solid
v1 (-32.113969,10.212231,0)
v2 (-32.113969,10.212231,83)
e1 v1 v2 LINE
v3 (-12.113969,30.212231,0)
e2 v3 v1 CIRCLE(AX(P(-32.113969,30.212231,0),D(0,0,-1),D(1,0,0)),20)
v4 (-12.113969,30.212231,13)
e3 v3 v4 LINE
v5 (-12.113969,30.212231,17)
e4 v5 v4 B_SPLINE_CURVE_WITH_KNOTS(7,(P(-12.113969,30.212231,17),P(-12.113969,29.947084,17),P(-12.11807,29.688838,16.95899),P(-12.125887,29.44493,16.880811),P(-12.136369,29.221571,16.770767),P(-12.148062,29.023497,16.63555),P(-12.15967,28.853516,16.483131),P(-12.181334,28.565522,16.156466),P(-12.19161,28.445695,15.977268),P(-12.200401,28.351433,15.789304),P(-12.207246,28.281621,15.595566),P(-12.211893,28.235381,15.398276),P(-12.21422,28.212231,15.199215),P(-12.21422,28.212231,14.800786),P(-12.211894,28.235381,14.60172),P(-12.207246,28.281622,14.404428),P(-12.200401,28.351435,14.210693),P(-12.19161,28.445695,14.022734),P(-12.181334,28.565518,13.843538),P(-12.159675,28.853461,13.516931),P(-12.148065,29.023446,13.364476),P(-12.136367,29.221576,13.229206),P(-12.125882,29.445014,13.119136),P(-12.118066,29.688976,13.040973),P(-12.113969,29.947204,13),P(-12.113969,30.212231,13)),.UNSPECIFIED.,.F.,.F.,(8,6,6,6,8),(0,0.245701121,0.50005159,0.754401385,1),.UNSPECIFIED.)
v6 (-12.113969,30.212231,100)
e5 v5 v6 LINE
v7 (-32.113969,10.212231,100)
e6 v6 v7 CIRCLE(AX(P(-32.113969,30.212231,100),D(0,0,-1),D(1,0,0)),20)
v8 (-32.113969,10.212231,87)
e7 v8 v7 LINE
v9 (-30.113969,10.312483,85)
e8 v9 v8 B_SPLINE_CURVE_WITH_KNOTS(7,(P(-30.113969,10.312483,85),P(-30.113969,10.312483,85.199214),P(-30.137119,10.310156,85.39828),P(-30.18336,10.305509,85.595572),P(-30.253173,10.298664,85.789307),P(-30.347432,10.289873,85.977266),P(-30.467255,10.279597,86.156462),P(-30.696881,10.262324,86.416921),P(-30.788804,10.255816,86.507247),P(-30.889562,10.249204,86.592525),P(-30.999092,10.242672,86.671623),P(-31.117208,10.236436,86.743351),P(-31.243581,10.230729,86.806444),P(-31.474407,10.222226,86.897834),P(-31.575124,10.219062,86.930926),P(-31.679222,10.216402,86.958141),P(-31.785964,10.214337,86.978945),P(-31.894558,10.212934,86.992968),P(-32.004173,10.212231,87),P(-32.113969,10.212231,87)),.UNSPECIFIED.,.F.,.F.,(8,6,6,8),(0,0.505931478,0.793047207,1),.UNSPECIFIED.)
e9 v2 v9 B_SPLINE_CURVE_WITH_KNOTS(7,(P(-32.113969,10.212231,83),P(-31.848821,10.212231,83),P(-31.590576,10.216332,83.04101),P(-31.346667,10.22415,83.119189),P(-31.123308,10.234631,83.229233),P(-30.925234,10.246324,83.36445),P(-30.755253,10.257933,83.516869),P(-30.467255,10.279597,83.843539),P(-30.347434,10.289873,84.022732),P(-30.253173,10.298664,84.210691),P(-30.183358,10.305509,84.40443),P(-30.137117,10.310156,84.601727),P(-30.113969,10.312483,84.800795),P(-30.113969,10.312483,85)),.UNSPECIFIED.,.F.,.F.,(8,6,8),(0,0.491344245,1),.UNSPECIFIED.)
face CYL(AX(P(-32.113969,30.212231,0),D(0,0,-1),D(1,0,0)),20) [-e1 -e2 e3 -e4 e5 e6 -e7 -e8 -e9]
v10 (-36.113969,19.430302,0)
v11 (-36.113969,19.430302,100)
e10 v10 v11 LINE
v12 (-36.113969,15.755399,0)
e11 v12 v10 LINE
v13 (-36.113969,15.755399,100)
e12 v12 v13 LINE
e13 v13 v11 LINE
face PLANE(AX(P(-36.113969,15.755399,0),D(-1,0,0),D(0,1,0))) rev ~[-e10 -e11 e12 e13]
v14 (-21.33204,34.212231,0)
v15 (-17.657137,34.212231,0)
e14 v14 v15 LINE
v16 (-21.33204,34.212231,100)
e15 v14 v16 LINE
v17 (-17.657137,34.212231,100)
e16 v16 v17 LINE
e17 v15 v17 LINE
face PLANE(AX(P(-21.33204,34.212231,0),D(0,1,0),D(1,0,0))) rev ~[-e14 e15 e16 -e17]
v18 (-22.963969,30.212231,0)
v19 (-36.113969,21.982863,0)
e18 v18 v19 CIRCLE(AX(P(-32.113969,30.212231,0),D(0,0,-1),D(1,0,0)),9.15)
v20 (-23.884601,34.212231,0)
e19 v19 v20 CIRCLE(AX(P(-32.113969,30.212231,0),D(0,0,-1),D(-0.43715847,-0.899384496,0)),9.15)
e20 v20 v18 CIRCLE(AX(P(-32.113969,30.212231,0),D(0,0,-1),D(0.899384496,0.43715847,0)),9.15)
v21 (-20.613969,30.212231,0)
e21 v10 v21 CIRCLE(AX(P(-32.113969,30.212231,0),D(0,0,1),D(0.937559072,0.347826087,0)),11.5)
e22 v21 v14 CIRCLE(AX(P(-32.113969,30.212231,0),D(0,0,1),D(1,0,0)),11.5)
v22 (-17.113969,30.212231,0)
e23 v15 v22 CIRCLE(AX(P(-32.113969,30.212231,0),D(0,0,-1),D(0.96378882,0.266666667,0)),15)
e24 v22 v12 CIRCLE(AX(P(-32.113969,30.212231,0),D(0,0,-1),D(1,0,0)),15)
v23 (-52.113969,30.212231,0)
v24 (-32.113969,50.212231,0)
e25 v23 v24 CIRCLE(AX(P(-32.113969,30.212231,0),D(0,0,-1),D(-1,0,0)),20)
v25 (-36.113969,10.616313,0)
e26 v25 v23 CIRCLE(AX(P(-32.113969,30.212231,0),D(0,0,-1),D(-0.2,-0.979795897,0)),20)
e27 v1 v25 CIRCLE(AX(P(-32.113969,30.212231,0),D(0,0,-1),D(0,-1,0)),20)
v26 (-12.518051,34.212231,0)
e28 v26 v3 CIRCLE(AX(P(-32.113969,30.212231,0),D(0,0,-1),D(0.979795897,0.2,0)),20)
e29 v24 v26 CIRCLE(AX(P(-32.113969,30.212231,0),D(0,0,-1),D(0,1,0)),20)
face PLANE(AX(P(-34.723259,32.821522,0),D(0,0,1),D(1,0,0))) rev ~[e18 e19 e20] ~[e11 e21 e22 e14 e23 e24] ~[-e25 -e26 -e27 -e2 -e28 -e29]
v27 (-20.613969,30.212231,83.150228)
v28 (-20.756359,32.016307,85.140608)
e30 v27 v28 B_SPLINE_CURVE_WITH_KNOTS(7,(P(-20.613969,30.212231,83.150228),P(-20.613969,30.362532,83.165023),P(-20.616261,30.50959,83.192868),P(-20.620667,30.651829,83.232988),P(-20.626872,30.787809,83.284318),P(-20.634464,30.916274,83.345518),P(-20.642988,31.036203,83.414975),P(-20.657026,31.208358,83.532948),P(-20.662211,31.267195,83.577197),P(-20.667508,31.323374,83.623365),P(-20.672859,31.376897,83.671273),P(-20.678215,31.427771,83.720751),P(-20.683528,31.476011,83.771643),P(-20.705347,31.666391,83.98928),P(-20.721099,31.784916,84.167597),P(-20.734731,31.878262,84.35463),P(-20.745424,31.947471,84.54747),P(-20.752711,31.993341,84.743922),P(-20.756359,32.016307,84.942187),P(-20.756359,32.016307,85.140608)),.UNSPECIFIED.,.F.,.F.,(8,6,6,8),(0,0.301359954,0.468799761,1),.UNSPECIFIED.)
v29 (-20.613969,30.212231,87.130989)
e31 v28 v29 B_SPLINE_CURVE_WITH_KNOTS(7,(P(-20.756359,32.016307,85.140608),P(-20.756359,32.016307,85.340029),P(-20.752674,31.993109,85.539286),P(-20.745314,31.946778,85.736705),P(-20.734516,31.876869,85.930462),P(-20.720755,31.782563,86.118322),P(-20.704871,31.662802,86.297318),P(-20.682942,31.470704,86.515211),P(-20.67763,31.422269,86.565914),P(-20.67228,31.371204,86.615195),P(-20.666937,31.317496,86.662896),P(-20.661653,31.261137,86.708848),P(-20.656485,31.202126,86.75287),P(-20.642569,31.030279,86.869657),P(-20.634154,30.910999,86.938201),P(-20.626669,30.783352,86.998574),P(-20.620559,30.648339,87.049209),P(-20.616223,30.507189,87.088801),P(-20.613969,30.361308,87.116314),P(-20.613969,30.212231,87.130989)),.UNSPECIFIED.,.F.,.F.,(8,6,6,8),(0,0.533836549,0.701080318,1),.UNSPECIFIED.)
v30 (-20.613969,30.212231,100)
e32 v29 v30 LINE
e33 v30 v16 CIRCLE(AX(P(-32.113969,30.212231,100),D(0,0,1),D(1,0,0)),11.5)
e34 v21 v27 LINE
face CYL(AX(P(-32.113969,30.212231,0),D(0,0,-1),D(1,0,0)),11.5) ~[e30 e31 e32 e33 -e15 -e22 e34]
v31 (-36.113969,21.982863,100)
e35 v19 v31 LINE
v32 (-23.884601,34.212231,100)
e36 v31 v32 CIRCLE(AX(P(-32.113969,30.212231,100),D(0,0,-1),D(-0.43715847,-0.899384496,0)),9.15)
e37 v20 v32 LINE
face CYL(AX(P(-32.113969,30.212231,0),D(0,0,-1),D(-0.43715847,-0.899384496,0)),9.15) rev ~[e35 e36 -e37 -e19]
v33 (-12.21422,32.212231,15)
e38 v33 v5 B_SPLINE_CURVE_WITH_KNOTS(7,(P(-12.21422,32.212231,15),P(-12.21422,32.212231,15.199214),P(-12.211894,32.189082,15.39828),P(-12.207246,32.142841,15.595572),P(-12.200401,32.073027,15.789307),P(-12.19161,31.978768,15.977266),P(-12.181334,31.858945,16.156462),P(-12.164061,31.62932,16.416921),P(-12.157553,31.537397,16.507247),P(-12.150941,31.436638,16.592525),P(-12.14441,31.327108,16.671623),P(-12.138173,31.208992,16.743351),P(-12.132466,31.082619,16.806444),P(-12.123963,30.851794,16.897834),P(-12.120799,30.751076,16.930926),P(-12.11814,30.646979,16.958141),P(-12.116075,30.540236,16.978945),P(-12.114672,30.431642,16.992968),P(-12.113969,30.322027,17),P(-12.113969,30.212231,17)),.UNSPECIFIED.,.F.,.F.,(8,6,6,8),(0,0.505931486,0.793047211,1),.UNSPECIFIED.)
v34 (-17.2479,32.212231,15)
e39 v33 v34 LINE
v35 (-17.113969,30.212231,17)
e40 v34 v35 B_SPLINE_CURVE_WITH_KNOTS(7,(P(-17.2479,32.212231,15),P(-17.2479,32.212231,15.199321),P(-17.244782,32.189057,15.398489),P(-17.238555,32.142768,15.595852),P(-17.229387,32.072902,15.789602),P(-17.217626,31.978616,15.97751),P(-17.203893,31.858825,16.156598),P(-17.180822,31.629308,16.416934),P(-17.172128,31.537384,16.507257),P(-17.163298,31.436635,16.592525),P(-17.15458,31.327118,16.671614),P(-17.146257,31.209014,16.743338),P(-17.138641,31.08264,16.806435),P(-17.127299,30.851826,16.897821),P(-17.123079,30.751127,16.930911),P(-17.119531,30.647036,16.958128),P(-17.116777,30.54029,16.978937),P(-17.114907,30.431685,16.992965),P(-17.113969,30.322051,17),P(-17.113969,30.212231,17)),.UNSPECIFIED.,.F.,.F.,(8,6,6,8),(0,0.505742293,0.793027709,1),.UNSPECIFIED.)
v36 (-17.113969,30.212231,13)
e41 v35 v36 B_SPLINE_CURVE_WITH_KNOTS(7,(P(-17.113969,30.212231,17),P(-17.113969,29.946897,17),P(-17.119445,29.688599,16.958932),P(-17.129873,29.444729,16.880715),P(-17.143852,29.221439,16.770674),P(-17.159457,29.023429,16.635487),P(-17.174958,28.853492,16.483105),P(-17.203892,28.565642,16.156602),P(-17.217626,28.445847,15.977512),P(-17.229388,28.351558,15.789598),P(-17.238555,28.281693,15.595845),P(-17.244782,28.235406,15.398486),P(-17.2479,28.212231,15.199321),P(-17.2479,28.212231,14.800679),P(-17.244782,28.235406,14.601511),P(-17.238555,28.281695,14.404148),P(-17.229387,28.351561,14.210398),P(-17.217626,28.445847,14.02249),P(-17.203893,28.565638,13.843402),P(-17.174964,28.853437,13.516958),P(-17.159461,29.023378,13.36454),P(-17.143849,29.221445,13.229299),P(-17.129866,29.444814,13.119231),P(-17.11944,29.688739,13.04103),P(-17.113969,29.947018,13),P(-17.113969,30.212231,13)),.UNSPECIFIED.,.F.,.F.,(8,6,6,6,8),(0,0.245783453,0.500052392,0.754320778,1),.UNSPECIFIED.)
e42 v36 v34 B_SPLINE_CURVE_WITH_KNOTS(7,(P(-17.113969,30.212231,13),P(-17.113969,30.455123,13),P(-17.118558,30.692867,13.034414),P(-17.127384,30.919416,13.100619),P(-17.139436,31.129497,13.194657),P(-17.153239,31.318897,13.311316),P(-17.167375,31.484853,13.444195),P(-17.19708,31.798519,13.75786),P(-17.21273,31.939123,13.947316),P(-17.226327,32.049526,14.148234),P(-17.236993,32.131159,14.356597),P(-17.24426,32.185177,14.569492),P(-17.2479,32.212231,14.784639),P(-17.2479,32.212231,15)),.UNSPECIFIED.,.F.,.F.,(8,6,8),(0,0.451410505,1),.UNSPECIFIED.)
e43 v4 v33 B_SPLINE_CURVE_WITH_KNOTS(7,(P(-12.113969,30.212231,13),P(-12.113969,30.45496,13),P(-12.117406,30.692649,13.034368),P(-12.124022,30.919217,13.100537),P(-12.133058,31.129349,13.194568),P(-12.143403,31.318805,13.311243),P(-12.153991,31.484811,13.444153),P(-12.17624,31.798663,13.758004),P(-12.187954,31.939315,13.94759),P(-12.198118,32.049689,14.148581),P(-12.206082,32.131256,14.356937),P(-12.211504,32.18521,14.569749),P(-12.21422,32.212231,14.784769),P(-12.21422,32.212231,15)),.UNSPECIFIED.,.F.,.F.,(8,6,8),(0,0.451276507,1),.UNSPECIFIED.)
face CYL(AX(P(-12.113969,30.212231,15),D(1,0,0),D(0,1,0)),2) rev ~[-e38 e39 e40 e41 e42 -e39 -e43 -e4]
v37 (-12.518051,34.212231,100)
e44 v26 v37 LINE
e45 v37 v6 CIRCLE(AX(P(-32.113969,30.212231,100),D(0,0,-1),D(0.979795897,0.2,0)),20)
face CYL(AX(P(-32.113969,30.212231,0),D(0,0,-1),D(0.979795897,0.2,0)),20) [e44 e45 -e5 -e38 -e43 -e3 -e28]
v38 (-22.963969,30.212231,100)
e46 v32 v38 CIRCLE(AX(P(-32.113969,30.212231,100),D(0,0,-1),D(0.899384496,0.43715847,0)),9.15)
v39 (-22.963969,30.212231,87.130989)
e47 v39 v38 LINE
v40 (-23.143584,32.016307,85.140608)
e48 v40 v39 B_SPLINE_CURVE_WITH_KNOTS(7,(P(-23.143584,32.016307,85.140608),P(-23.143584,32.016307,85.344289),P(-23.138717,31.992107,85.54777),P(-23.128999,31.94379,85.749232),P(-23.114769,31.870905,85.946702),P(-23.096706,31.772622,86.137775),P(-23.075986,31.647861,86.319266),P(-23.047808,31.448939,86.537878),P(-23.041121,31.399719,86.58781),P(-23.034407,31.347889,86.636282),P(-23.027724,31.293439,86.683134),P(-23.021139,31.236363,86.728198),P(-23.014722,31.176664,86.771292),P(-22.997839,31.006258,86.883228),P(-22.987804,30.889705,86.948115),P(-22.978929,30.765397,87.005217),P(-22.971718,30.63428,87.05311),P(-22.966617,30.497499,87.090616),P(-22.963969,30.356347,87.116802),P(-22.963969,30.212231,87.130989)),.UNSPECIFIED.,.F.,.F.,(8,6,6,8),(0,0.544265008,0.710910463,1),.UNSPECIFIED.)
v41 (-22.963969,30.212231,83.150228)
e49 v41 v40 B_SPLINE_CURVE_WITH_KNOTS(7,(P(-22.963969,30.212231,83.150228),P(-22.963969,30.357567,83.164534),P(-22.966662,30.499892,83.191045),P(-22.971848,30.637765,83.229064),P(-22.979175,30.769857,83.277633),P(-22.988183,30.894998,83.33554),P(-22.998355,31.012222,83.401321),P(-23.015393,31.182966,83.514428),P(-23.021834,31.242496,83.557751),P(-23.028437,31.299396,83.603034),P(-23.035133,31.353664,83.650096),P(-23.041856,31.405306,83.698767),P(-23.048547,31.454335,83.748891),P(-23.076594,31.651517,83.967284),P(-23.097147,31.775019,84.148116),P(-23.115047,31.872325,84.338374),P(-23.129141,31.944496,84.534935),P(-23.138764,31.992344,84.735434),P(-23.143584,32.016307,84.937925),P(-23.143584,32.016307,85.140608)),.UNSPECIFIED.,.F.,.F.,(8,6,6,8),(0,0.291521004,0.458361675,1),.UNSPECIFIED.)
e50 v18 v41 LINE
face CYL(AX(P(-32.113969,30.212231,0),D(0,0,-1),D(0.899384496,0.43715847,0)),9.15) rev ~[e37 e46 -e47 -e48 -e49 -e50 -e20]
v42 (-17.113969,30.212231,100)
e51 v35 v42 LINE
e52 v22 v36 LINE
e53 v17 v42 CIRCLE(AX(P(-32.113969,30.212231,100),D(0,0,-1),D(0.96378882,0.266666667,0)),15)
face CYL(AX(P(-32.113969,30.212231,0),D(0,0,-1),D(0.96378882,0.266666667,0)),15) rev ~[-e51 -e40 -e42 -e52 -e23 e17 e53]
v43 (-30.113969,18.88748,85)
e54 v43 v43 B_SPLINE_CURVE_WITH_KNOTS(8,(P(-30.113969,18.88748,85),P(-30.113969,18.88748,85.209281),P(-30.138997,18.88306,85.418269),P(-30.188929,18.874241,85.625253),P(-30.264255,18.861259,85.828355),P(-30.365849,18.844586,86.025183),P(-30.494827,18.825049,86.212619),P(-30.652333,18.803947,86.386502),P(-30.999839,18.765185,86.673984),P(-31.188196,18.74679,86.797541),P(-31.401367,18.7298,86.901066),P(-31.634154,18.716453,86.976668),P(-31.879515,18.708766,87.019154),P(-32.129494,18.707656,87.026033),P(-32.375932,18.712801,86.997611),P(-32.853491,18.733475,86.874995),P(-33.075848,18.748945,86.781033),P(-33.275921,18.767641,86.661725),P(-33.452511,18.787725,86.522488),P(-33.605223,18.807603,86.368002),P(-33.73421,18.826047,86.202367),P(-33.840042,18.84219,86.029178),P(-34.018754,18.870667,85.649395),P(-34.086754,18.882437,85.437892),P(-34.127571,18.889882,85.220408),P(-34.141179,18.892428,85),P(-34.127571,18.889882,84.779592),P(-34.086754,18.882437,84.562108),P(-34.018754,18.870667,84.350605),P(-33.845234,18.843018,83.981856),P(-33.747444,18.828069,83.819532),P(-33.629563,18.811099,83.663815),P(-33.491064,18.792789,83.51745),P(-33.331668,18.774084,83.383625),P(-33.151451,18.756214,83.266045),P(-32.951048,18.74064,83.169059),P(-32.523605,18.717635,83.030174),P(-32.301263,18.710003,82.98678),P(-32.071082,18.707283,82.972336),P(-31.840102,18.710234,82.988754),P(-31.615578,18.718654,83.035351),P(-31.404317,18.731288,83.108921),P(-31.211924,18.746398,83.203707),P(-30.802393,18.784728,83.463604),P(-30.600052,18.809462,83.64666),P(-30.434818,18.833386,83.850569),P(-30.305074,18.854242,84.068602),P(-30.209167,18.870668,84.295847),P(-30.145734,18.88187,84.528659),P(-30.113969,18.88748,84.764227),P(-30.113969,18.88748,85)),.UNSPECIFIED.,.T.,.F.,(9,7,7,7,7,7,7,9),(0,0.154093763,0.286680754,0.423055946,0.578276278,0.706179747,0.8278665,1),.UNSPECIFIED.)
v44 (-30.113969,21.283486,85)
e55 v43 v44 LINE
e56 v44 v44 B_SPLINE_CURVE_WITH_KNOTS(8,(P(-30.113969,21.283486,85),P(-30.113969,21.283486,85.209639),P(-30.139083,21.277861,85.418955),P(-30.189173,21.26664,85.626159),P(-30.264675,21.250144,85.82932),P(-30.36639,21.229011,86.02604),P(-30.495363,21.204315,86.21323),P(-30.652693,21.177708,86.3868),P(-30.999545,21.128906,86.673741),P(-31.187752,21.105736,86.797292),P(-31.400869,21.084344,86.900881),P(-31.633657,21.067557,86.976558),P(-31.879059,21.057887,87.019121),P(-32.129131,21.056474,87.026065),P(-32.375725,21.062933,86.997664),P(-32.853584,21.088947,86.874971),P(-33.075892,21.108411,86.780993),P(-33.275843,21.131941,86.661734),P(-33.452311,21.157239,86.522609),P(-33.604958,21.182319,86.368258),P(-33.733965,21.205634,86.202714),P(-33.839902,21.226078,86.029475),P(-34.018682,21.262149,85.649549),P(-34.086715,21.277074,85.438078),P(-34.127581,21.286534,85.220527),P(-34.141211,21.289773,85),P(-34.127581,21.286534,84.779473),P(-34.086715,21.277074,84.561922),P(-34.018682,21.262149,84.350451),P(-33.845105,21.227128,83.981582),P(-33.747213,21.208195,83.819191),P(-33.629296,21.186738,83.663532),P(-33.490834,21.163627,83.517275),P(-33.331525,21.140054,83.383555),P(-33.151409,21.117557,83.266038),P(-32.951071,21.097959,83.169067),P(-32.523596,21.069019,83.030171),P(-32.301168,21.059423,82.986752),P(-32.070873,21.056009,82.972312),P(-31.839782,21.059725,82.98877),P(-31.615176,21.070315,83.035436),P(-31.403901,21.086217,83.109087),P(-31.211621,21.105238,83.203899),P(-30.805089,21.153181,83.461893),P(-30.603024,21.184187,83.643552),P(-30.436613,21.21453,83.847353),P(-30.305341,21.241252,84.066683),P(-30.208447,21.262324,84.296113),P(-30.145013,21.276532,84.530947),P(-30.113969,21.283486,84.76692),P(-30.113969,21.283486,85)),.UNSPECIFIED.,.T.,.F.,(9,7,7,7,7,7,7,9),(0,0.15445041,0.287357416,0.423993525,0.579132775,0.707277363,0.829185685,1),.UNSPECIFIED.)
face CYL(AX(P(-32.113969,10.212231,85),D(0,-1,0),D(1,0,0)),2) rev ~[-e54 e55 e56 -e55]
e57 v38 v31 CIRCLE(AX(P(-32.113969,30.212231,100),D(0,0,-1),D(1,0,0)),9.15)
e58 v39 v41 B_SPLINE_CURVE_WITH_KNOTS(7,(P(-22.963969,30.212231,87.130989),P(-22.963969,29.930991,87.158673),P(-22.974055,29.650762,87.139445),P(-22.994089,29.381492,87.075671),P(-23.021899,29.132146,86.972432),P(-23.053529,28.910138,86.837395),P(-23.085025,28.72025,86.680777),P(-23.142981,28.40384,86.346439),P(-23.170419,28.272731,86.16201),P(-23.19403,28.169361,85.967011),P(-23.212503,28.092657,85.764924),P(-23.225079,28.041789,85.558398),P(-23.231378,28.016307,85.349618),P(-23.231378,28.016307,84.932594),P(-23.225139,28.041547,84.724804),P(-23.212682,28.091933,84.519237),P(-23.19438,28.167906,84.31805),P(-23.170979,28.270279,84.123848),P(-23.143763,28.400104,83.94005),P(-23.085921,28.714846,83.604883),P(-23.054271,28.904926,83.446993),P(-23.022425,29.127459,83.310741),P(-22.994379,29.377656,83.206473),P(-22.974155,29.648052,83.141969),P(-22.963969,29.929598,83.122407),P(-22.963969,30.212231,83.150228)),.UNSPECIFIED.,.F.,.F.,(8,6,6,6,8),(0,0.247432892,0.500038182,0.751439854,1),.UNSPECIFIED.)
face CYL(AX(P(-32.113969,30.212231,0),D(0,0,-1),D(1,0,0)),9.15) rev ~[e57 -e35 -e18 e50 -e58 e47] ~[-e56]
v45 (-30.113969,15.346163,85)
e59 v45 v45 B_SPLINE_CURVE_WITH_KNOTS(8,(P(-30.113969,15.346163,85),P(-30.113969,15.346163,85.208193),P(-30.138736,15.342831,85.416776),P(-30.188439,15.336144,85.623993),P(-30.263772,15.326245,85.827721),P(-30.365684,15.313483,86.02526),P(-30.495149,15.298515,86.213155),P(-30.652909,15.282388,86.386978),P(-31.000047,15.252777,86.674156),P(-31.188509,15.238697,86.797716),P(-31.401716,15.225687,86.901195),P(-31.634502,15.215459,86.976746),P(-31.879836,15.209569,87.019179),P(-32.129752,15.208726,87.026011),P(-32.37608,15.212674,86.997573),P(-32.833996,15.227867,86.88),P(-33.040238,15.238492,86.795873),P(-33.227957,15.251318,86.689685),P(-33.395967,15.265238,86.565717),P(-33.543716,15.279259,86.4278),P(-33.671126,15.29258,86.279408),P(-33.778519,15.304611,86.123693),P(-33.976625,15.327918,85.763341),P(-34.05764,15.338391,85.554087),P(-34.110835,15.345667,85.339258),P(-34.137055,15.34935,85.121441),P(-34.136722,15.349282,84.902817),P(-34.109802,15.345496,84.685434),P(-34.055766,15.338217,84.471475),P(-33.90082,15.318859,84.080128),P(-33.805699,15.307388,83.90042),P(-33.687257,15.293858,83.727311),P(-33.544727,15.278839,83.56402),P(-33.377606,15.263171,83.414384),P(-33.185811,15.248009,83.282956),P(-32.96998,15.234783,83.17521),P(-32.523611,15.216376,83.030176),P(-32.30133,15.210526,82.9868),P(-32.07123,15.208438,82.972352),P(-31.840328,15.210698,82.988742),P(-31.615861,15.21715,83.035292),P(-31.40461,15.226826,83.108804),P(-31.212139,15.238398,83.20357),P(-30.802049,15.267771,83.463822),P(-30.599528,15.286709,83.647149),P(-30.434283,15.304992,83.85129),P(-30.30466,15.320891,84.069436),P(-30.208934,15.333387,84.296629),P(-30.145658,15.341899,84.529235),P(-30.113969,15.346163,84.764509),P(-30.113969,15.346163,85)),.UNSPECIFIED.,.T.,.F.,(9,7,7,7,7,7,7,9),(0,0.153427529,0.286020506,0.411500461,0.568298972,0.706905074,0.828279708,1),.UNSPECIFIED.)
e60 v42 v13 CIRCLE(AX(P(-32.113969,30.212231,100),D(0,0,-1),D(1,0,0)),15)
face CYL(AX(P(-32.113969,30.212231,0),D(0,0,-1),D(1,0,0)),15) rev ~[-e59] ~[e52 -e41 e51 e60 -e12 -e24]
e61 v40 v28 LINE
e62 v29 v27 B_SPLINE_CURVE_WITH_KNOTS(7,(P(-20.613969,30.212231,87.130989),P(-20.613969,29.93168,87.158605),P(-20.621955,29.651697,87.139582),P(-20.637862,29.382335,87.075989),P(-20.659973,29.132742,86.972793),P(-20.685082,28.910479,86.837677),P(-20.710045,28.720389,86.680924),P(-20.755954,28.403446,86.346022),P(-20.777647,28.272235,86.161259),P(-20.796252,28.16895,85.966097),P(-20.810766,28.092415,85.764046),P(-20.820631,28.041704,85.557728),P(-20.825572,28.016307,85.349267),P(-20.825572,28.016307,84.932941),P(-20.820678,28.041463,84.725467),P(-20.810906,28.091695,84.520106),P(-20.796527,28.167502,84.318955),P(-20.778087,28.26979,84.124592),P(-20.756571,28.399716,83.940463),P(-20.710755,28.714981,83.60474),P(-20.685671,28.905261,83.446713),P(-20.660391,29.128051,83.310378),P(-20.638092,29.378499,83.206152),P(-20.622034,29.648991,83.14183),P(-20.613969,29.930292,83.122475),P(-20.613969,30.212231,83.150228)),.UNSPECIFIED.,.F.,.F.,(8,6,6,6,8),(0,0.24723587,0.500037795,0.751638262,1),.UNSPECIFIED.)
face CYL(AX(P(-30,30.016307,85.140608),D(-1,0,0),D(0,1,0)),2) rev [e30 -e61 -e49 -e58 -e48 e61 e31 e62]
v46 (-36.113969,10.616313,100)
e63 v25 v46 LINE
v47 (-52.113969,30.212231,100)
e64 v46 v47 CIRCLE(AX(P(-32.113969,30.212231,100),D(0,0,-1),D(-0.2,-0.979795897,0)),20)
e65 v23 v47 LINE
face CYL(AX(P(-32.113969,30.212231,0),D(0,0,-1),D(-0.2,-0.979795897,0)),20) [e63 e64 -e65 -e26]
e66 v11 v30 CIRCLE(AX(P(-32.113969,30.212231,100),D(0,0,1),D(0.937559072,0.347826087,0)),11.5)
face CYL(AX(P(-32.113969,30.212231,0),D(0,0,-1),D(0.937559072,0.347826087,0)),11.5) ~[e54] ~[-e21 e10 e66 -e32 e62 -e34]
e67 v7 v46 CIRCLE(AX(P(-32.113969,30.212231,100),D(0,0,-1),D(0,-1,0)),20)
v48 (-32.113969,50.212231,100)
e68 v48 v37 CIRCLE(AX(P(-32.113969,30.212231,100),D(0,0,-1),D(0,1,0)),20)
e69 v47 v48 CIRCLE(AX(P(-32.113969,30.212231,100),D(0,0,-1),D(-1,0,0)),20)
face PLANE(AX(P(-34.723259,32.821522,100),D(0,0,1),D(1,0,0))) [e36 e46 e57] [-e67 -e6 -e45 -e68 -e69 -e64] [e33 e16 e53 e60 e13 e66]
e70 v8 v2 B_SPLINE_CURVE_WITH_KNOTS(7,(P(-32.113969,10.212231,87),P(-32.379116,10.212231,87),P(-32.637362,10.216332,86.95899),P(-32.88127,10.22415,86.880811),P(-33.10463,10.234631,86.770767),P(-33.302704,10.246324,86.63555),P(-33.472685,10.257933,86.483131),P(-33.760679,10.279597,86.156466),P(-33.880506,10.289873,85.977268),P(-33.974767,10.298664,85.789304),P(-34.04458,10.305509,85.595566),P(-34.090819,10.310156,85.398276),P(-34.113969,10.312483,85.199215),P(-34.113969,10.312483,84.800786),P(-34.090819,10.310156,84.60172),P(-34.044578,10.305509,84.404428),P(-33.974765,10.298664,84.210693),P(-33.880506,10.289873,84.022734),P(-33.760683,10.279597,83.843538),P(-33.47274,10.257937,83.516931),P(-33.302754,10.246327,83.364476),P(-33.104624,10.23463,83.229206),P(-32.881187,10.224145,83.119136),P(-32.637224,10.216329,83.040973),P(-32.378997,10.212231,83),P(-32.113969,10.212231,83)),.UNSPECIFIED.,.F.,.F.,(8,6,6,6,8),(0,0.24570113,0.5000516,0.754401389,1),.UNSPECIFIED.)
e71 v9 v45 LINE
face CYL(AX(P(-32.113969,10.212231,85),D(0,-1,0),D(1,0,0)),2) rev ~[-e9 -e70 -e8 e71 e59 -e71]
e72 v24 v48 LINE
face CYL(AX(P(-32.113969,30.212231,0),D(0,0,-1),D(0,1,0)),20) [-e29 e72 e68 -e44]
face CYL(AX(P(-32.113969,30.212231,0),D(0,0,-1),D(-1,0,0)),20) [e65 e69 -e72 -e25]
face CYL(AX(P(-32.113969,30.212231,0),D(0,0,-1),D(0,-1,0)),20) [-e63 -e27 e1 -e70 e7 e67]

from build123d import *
from build123d import SkipClean  # not in build123d's __all__

# Parameters (mm, degrees)
F1_DEPTH = 100
F2_R     = 2
F3_DEPTH = 15
F4_R     = 2
F5_DEPTH = 6
F6_DEPTH = 100.0010001
F8_R     = 2
F9_DEPTH = 10


with BuildPart() as f1:
    # F0 (on Top) → F1 (new body)
    with BuildSketch(Plane.XY):
        with BuildLine():
            ThreePointArc((-36.113968879, 21.9828632864), (-38.5839959268, 36.6822584753), (-23.884600738, 34.2122314274))
            Line((-23.884600738, 34.2122314274), (-21.3320395526, 34.2122314274))
            ThreePointArc((-21.3320395526, 34.2122314274), (-40.2456968626, 38.3439594111), (-36.113968879, 19.430302101))
            Line((-36.113968879, 19.430302101), (-36.113968879, 21.9828632864))
        make_face()
        with BuildLine():
            ThreePointArc((-23.884600738, 34.2122314274), (-23.1970967118, 32.2645205774), (-22.963968879, 30.2122314274))
            ThreePointArc((-22.963968879, 30.2122314274), (-27.2599756775, 22.4558630762), (-36.113968879, 21.9828632864))
            Line((-36.113968879, 21.9828632864), (-36.113968879, 19.430302101))
            ThreePointArc((-36.113968879, 19.430302101), (-25.5470061107, 20.7716276332), (-20.613968879, 30.2122314274))
            ThreePointArc((-20.613968879, 30.2122314274), (-20.7949100123, 32.2442024836), (-21.3320395526, 34.2122314274))
            Line((-21.3320395526, 34.2122314274), (-23.884600738, 34.2122314274))
        make_face()
        with BuildLine():
            ThreePointArc((-52.113968879, 30.2122314274), (-46.2561045027, 44.3543670512), (-32.113968879, 50.2122314274))
            Line((-32.113968879, 50.2122314274), (-52.113968879, 50.2122314274))
            Line((-52.113968879, 50.2122314274), (-52.113968879, 30.2122314274))
        make_face()
        with BuildLine():
            ThreePointArc((-32.113968879, 50.2122314274), (-19.4648582383, 45.7041648123), (-12.5180509367, 34.2122314274))
            ThreePointArc((-12.5180509367, 34.2122314274), (-12.2152458189, 32.2224106675), (-12.113968879, 30.2122314274))
            Line((-12.113968879, 30.2122314274), (-12.113968879, 50.2122314274))
            Line((-12.113968879, 50.2122314274), (-32.113968879, 50.2122314274))
        make_face()
        with BuildLine():
            Line((-12.113968879, 10.2122314274), (-12.113968879, 30.2122314274))
            ThreePointArc((-12.113968879, 30.2122314274), (-17.9718332553, 16.0700958037), (-32.113968879, 10.2122314274))
            Line((-32.113968879, 10.2122314274), (-12.113968879, 10.2122314274))
        make_face()
        with BuildLine():
            ThreePointArc((-32.113968879, 10.2122314274), (-34.1241481191, 10.3135083673), (-36.113968879, 10.6163134852))
            ThreePointArc((-36.113968879, 10.6163134852), (-47.6059022638, 17.5631207868), (-52.113968879, 30.2122314274))
            Line((-52.113968879, 30.2122314274), (-52.113968879, 10.2122314274))
            Line((-52.113968879, 10.2122314274), (-32.113968879, 10.2122314274))
        make_face()
        with BuildLine():
            ThreePointArc((-36.113968879, 15.7553991326), (-42.7205705968, 40.8188331452), (-17.6571365842, 34.2122314274))
            Line((-17.6571365842, 34.2122314274), (-12.5180509367, 34.2122314274))
            ThreePointArc((-12.5180509367, 34.2122314274), (-19.4648582383, 45.7041648123), (-32.113968879, 50.2122314274))
            ThreePointArc((-32.113968879, 50.2122314274), (-46.2561045027, 44.3543670512), (-52.113968879, 30.2122314274))
            ThreePointArc((-52.113968879, 30.2122314274), (-47.6059022638, 17.5631207868), (-36.113968879, 10.6163134852))
            Line((-36.113968879, 10.6163134852), (-36.113968879, 15.7553991326))
        make_face()
        with BuildLine():
            Line((-12.5180509367, 34.2122314274), (-17.6571365842, 34.2122314274))
            ThreePointArc((-17.6571365842, 34.2122314274), (-17.2503810816, 32.2305866462), (-17.113968879, 30.2122314274))
            ThreePointArc((-17.113968879, 30.2122314274), (-23.0310178167, 18.2748950411), (-36.113968879, 15.7553991326))
            Line((-36.113968879, 15.7553991326), (-36.113968879, 10.6163134852))
            ThreePointArc((-36.113968879, 10.6163134852), (-34.1241481191, 10.3135083673), (-32.113968879, 10.2122314274))
            ThreePointArc((-32.113968879, 10.2122314274), (-17.9718332553, 16.0700958037), (-12.113968879, 30.2122314274))
            ThreePointArc((-12.113968879, 30.2122314274), (-12.2152458189, 32.2224106675), (-12.5180509367, 34.2122314274))
        make_face()
        with BuildLine():
            ThreePointArc((-36.113968879, 19.430302101), (-40.2456968626, 38.3439594111), (-21.3320395526, 34.2122314274))
            Line((-21.3320395526, 34.2122314274), (-17.6571365842, 34.2122314274))
            ThreePointArc((-17.6571365842, 34.2122314274), (-42.7205705968, 40.8188331452), (-36.113968879, 15.7553991326))
            Line((-36.113968879, 15.7553991326), (-36.113968879, 19.430302101))
        make_face()
    extrude(amount=F1_DEPTH)

    # F2 (on face) → F3 (cut)
    with BuildSketch(Plane.XZ.offset(-10.2122314274)):
        with Locations((-32.113968879, 85)):
            Circle(F2_R)
    extrude(amount=-F3_DEPTH, mode=Mode.SUBTRACT)

    # F4 (on face) → F5 (cut)
    with BuildSketch(Plane.YZ.offset(-12.113968879)):
        with Locations((30.2122314274, 15)):
            Circle(F4_R)
    extrude(amount=-F5_DEPTH, mode=Mode.SUBTRACT)

    # F0 (on Top) → F6 (cut, through all)
    with BuildSketch(Plane.XY):
        with BuildLine():
            Line((-12.113968879, 10.2122314274), (-12.113968879, 30.2122314274))
            ThreePointArc((-12.113968879, 30.2122314274), (-17.9718332553, 16.0700958037), (-32.113968879, 10.2122314274))
            Line((-32.113968879, 10.2122314274), (-12.113968879, 10.2122314274))
        make_face()
        with BuildLine():
            ThreePointArc((-32.113968879, 10.2122314274), (-34.1241481191, 10.3135083673), (-36.113968879, 10.6163134852))
            ThreePointArc((-36.113968879, 10.6163134852), (-47.6059022638, 17.5631207868), (-52.113968879, 30.2122314274))
            Line((-52.113968879, 30.2122314274), (-52.113968879, 10.2122314274))
            Line((-52.113968879, 10.2122314274), (-32.113968879, 10.2122314274))
        make_face()
        with BuildLine():
            ThreePointArc((-52.113968879, 30.2122314274), (-46.2561045027, 44.3543670512), (-32.113968879, 50.2122314274))
            Line((-32.113968879, 50.2122314274), (-52.113968879, 50.2122314274))
            Line((-52.113968879, 50.2122314274), (-52.113968879, 30.2122314274))
        make_face()
        with BuildLine():
            ThreePointArc((-32.113968879, 50.2122314274), (-19.4648582383, 45.7041648123), (-12.5180509367, 34.2122314274))
            ThreePointArc((-12.5180509367, 34.2122314274), (-12.2152458189, 32.2224106675), (-12.113968879, 30.2122314274))
            Line((-12.113968879, 30.2122314274), (-12.113968879, 50.2122314274))
            Line((-12.113968879, 50.2122314274), (-32.113968879, 50.2122314274))
        make_face()
    with SkipClean():  # cleaning this boolean's faces spoils the solid; the shape is the same uncleaned
        extrude(amount=F6_DEPTH, mode=Mode.SUBTRACT)

    # F8 (on offset) → F9 (cut)
    with BuildSketch(Plane.YZ.offset(-30)):
        with Locations((30.0163067877, 85.1406082511)):
            Circle(F8_R)
    with SkipClean():  # cleaning this boolean's faces spoils the solid; the shape is the same uncleaned
        extrude(amount=F9_DEPTH, mode=Mode.SUBTRACT)


solid = f1.part
